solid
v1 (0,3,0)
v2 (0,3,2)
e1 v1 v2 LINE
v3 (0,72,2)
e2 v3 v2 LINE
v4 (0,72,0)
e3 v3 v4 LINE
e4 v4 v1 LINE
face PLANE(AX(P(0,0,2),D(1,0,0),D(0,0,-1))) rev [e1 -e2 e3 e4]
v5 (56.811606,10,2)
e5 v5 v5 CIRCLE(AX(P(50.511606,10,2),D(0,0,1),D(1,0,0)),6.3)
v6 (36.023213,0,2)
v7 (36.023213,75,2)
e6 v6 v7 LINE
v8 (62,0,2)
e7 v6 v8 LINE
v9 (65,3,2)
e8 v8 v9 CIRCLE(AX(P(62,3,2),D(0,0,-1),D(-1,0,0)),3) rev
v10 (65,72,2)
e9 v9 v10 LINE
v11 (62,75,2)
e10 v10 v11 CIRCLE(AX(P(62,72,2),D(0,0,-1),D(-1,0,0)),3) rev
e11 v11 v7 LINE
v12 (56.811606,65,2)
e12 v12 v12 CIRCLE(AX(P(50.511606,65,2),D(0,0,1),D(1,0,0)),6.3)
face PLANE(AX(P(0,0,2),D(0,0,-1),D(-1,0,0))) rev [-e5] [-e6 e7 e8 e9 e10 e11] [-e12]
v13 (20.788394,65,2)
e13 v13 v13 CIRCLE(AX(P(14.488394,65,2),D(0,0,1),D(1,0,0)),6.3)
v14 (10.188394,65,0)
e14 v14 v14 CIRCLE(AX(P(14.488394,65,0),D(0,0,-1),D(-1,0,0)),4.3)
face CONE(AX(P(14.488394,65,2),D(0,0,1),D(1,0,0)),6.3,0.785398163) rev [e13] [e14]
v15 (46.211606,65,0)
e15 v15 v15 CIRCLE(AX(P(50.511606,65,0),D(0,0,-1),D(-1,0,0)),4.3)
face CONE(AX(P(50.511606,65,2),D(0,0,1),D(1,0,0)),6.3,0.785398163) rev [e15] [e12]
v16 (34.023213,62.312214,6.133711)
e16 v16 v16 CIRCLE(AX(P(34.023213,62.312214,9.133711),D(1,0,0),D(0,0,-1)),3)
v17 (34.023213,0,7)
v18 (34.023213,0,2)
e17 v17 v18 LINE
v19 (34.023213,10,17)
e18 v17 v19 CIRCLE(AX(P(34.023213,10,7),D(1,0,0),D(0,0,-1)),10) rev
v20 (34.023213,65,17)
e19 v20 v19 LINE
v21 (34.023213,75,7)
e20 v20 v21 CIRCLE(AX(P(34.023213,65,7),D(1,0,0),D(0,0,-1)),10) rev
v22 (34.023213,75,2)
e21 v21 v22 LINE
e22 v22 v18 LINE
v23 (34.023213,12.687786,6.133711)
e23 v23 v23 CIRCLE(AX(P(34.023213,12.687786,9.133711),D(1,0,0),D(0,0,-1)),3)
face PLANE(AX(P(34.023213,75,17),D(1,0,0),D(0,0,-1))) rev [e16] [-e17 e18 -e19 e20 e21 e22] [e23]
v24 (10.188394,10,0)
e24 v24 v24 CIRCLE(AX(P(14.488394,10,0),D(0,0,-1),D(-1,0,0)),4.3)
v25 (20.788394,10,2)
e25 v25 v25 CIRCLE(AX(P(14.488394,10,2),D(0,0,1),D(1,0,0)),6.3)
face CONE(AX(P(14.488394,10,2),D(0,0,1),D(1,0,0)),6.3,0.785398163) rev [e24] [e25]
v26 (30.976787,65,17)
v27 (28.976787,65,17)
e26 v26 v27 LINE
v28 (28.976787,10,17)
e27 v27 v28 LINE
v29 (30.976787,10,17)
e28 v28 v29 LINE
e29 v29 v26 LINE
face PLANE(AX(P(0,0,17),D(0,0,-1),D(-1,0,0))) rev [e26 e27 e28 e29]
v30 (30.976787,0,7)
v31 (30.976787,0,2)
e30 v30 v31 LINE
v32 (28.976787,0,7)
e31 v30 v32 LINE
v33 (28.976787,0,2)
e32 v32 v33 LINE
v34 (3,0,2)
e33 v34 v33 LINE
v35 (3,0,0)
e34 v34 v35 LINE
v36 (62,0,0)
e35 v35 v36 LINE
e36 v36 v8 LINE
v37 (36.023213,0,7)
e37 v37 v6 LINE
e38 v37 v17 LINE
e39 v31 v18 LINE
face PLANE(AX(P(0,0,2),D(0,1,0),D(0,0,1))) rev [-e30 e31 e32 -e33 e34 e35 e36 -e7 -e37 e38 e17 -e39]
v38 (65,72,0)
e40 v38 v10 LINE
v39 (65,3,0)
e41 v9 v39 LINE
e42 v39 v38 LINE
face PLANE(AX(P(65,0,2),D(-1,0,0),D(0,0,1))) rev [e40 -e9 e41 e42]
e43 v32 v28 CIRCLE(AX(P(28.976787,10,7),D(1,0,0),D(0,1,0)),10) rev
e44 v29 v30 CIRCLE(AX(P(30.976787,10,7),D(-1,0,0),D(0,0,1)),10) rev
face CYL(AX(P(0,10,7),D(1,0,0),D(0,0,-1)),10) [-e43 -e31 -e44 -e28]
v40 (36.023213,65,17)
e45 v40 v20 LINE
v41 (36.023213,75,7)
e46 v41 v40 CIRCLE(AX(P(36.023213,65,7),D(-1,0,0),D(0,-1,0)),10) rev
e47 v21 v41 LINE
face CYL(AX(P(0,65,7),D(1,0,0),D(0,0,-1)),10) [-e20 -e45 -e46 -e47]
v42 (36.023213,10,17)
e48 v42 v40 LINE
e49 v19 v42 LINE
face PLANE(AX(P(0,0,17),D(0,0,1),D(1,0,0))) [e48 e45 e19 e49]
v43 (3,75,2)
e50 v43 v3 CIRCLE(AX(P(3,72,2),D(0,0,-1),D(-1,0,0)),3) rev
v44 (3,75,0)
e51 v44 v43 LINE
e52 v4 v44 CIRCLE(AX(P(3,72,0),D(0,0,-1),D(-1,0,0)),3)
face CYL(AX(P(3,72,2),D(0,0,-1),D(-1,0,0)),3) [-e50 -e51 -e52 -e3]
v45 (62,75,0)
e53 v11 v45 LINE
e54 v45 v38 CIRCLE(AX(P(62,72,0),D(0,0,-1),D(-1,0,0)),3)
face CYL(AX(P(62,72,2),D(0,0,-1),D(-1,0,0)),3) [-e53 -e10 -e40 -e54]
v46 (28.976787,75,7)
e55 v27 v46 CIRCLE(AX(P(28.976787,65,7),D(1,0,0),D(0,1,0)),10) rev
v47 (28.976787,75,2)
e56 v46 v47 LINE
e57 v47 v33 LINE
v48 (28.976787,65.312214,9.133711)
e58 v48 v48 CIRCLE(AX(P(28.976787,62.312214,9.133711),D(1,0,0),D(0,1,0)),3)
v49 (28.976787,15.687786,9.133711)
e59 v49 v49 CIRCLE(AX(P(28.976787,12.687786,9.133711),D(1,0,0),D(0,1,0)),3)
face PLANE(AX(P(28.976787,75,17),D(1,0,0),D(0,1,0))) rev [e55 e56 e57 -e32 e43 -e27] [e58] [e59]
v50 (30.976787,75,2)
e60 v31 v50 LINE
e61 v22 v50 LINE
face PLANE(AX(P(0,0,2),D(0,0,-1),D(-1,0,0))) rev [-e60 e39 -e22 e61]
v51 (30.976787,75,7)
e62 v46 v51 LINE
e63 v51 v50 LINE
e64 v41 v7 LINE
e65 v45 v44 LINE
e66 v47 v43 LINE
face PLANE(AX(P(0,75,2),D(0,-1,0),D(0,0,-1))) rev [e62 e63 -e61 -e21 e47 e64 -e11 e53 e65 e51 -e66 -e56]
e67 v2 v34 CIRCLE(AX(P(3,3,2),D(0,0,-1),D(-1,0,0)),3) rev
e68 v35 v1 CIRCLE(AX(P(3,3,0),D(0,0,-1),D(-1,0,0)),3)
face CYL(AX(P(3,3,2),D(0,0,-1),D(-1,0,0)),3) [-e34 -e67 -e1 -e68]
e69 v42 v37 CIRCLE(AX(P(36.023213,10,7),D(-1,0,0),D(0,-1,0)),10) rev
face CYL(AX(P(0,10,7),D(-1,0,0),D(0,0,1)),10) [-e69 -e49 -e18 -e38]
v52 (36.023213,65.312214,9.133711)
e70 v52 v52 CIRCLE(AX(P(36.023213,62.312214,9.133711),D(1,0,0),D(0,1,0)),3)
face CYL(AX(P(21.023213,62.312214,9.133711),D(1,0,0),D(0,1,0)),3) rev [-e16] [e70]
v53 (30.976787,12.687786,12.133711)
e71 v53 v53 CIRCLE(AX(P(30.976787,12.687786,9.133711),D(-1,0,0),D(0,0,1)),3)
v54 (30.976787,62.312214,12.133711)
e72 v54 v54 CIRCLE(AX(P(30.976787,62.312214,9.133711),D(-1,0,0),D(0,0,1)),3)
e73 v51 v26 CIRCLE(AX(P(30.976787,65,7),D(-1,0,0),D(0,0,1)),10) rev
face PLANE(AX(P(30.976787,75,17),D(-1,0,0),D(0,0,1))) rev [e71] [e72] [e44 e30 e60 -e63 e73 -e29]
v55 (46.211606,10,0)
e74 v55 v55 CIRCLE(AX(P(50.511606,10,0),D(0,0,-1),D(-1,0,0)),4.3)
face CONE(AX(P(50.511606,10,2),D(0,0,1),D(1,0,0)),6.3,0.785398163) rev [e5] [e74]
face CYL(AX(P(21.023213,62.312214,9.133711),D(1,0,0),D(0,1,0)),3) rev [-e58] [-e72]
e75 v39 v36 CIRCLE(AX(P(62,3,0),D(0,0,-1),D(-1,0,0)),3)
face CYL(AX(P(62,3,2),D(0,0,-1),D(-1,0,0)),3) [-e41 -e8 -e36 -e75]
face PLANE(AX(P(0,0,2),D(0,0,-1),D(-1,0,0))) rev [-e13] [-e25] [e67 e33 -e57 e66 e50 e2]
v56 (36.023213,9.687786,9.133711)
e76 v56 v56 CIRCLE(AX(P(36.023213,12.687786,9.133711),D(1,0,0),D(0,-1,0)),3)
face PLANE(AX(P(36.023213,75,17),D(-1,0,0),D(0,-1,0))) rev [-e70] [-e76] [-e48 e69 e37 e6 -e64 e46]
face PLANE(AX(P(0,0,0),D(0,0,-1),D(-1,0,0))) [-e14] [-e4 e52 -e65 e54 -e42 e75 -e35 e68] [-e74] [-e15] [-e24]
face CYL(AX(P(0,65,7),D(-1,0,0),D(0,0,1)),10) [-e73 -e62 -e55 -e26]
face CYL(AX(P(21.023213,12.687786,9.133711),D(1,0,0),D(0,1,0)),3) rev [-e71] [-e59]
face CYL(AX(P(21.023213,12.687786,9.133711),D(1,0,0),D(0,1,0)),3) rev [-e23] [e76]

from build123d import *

# Parameters (mm, degrees)
ESQUISSE1_W             = 65
ESQUISSE1_H             = 75
BOSS_EXTRU_1_DEPTH      = 2
ESQUISSE2_W             = 2
ESQUISSE2_H             = 75
BOSS_EXTRU_2_DEPTH      = 15
CONG_1_R                = 3
CONG_2_R                = 10
ESQUISSE6_R             = 3
ENL_V_MAT_EXTRU_1_DEPTH = 15


# Read off the part's stored shape, not the designer's step: Fraisage pour vis à tête fraisée M61
with BuildPart() as part:
    # Esquisse1 → Boss.-Extru.1 (new body)
    with BuildSketch(Plane.XY):
        with Locations((32.5, 37.5)):
            Rectangle(ESQUISSE1_W, ESQUISSE1_H)
    extrude(amount=BOSS_EXTRU_1_DEPTH)

    # Esquisse2 → Boss.-Extru.2 (add)
    with BuildSketch(Plane.XY.offset(2)):
        with Locations((29.976787497, 37.5)):
            Rectangle(ESQUISSE2_W, ESQUISSE2_H)
        with Locations((35.023212503, 37.5)):
            Rectangle(ESQUISSE2_W, ESQUISSE2_H)
    extrude(amount=BOSS_EXTRU_2_DEPTH)

    # Congé1
    cong_1_edges = [part.edges().sort_by_distance(p)[0] for p in [
        (0, 75, 1),
        (65, 75, 1),
        (65, 0, 1),
        (0, 0, 1),
    ]]
    fillet(cong_1_edges, radius=CONG_1_R)

    # Congé2
    cong_2_edges = [part.edges().sort_by_distance(p)[0] for p in [
        (35.023212503, 0, 17),
        (35.023212503, 75, 17),
        (29.976787497, 75, 17),
        (29.976787497, 0, 17),
    ]]
    fillet(cong_2_edges, radius=CONG_2_R)

    # Fraisage pour vis à tête fraisée M61 out → Fraisage pour vis à tête fraisée M61 (revolve, cut)
    with BuildSketch(Plane(origin=(50.511606252, 65, 0), x_dir=(1, 0, 0), z_dir=(0, -1, 0))):
        Polygon((6.3, 2), (0, 2), (0, 0), (4.3, 0), align=None)
    revolve(axis=Axis((50.511606252, 65, 0), (0, 0, 1)), mode=Mode.SUBTRACT)

    # Fraisage pour vis _ t_te frais_e M61 2 o → Fraisage pour vis _ t_te frais_e M61 2 (revolve, cut)
    with BuildSketch(Plane(origin=(50.511606252, 10, 0), x_dir=(1, 0, 0), z_dir=(0, -1, 0))):
        Polygon((6.3, 2), (0, 2), (0, 0), (4.3, 0), align=None)
    revolve(axis=Axis((50.511606252, 10, 0), (0, 0, 1)), mode=Mode.SUBTRACT)

    # Fraisage pour vis _ t_te frais_e M61 3 o → Fraisage pour vis _ t_te frais_e M61 3 (revolve, cut)
    with BuildSketch(Plane(origin=(14.488393748, 10, 0), x_dir=(1, 0, 0), z_dir=(0, -1, 0))):
        Polygon((6.3, 2), (0, 2), (0, 0), (4.3, 0), align=None)
    revolve(axis=Axis((14.488393748, 10, 0), (0, 0, 1)), mode=Mode.SUBTRACT)

    # Fraisage pour vis _ t_te frais_e M61 4 o → Fraisage pour vis _ t_te frais_e M61 4 (revolve, cut)
    with BuildSketch(Plane(origin=(14.488393748, 65, 0), x_dir=(1, 0, 0), z_dir=(0, -1, 0))):
        Polygon((6.3, 2), (0, 2), (0, 0), (4.3, 0), align=None)
    revolve(axis=Axis((14.488393748, 65, 0), (0, 0, 1)), mode=Mode.SUBTRACT)

    # Esquisse6 → Enlèv. mat.-Extru.1 (cut)
    with BuildSketch(Plane(origin=(36.023212503, 0, 0), x_dir=(0, 0, -1), z_dir=(1, 0, 0))):
        with Locations(Location((-9.133710771, 62.312214024, 0), (0, 0, 90))):
            Circle(ESQUISSE6_R)
        with Locations(Location((-9.133710771, 12.687785976, 0), (0, 0, 90))):
            Circle(ESQUISSE6_R)
    extrude(amount=-ENL_V_MAT_EXTRU_1_DEPTH, mode=Mode.SUBTRACT)


solid = part.part
